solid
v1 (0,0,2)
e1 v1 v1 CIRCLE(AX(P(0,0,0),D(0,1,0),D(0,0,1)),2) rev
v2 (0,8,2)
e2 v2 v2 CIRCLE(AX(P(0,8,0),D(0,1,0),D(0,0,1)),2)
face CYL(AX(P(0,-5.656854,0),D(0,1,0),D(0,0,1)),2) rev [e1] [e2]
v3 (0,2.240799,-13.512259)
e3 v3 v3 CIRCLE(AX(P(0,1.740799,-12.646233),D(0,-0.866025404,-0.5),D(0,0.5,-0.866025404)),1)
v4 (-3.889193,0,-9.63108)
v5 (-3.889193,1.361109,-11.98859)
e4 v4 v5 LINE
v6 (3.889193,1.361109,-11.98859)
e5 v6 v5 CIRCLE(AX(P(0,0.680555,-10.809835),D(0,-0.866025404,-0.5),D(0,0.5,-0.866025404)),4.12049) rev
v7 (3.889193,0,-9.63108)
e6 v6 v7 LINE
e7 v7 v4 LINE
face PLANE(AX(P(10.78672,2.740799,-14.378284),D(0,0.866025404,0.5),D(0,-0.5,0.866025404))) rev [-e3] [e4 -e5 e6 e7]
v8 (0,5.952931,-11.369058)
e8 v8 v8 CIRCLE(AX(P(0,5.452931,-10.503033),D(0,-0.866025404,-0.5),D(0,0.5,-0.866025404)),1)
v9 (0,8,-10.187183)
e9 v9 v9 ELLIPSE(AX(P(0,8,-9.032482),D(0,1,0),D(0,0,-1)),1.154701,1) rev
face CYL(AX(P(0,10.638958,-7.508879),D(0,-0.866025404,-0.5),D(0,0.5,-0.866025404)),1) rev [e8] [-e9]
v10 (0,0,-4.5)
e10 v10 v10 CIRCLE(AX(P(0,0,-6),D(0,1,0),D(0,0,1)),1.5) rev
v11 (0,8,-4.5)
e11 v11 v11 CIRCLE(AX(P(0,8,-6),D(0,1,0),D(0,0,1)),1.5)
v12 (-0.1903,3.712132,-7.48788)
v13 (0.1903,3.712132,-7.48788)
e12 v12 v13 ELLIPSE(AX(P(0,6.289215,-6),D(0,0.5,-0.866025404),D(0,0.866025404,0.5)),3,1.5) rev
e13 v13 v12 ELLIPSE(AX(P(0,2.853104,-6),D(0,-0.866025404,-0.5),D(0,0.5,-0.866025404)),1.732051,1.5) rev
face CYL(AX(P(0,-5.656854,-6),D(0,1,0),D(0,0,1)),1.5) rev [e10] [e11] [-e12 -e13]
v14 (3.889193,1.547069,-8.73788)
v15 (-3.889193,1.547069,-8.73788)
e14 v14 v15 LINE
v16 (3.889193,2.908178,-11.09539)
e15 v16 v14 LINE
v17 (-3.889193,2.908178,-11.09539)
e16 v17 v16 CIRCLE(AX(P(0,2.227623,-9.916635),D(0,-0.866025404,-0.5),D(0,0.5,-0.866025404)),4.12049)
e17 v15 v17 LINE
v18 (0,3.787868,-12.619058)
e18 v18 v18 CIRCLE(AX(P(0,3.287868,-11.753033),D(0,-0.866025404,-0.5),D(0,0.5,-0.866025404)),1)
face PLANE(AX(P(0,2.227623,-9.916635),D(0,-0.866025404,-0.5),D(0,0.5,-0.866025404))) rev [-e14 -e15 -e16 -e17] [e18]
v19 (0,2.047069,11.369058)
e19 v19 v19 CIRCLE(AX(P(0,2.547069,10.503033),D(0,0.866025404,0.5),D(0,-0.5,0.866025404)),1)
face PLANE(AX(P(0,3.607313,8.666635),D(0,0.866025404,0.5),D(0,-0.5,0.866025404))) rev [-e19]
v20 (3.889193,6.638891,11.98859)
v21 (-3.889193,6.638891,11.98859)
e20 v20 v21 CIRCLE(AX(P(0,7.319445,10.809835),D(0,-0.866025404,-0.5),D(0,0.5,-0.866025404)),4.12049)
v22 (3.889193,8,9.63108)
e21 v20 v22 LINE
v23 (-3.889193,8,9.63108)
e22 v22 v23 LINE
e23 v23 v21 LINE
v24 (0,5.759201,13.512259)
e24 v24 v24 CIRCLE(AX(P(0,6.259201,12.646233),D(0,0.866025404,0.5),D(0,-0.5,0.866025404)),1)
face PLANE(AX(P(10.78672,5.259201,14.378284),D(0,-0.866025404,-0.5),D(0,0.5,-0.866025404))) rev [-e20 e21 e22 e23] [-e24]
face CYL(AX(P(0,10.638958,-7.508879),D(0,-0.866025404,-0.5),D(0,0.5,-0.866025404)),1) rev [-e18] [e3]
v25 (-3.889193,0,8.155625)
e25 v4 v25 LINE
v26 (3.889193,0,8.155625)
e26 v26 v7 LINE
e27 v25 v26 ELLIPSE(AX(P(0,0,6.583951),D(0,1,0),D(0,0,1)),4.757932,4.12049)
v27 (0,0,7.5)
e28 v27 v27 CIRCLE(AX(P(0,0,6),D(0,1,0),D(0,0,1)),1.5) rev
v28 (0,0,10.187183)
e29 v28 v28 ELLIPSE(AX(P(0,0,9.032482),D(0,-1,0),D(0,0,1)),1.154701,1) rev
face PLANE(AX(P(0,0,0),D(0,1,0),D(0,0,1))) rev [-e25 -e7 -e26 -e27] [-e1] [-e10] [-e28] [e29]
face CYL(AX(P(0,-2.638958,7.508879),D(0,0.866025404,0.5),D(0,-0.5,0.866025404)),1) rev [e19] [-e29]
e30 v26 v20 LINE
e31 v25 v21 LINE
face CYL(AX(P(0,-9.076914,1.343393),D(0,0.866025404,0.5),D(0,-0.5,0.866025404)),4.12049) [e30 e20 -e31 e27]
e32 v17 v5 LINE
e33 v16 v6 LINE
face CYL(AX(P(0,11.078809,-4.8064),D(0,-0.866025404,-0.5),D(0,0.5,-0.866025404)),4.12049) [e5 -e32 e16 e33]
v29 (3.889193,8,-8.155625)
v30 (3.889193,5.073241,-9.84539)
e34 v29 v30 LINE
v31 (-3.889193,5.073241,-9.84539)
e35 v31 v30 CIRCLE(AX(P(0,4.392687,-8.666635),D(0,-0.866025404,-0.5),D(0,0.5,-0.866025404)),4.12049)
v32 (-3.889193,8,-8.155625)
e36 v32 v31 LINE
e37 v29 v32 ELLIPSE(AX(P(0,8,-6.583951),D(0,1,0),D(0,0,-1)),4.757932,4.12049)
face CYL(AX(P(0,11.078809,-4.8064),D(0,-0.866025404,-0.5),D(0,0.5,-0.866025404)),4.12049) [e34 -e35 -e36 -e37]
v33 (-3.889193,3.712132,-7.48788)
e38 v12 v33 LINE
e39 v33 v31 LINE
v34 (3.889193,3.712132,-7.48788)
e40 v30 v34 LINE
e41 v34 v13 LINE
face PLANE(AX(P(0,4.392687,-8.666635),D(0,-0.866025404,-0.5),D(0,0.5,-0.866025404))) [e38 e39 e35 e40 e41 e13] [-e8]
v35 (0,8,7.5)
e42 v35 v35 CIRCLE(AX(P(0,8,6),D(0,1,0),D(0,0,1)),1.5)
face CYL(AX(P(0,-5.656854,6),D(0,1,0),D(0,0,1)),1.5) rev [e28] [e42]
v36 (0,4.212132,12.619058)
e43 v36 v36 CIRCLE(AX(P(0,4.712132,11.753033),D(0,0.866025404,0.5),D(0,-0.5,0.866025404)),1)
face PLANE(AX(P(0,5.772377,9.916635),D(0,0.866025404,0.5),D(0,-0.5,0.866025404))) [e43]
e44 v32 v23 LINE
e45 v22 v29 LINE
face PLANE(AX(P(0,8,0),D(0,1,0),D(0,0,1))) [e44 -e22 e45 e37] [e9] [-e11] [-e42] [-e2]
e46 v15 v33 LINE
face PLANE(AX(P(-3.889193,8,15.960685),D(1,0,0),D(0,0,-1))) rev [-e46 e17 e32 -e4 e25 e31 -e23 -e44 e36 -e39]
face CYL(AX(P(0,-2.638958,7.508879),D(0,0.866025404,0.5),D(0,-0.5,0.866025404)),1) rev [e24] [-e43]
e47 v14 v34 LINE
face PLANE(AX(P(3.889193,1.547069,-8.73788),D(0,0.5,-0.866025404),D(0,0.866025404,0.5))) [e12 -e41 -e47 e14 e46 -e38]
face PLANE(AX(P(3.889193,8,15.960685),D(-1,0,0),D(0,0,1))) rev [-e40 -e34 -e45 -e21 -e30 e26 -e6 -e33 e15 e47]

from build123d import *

# Parameters (mm, degrees)
SKETCH_1_W                      = 7.778385112
SKETCH_1_H                      = 31.92137072
EXTRUDE_1_DEPTH                 = 8
SKETCH_2_R                      = 1.5
SKETCH_2_R_2                    = 2
CUT_EXTRUDE_1_DEPTH             = 8
SKETCH_3_W                      = 7.778385112
SKETCH_3_H                      = 11.681320089
CUT_EXTRUDE_2_DEPTH             = 7
CUT_EXTRUDE_3_DEPTH             = 7.778385113
CUT_EXTRUDE_6_REACH             = 24.375
CUT_EXTRUDE_7_DEPTH             = 1.25
CUT_EXTRUDE_7_DEPTH_BACK        = 1.25
CUT_EXTRUDE_8_REACH             = 24.375
SKETCH_8_R                      = 1
PATTERN_CIRCULAR_5_COUNT        = 2
CUT_EXTRUDE_9_DEPTH             = 23.991982407
CUT_EXTRUDE_9_DEPTH_BACK        = 23.991982407
PATTERN_START                   = 3.938890695
PATTERN_CIRCULAR_14_OUTLINE_R   = 1
PATTERN_CIRCULAR_14_DEPTH       = 3.518451758
PATTERN_START_2                 = 9.957342453
PATTERN_CIRCULAR_14_2_OUTLINE_R = 1
PATTERN_CIRCULAR_14_2_DEPTH     = 1.78640085


# Read off the part's stored shape, not the designer's step: 阵列(圆周)14
with BuildPart() as part:
    # 草图1 → 凸台-拉伸1 (new body)
    with BuildSketch(Plane(origin=(0, 0, 0), x_dir=(1, 0, 0), z_dir=(0, 1, 0))):
        Rectangle(SKETCH_1_W, SKETCH_1_H)
    extrude(amount=EXTRUDE_1_DEPTH)

    # 草图2 → 切除-拉伸1 (cut)
    with BuildSketch(Plane(origin=(0, 8, 0), x_dir=(1, 0, 0), z_dir=(0, 1, 0))):
        with Locations(Location((0, 6, 0), (0, 0, 270))):
            Circle(SKETCH_2_R)
        with Locations(Location((0, -6, 0), (0, 0, 270))):
            Circle(SKETCH_2_R)
        with Locations(Location((0, 0, 0), (0, 0, 270))):
            Circle(SKETCH_2_R_2)
    extrude(amount=-CUT_EXTRUDE_1_DEPTH, mode=Mode.SUBTRACT)

    # 草图3 → 切除-拉伸2 (cut)
    with BuildSketch(Plane(origin=(0, 6.911179492, -11.97051402), x_dir=(-1, 0, 0), z_dir=(0, -0.499999999999998, 0.8660254037844398))):
        with Locations((0, 2.139682636)):
            Rectangle(SKETCH_3_W, SKETCH_3_H)
    cut_extrude_2 = extrude(amount=-CUT_EXTRUDE_2_DEPTH, mode=Mode.SUBTRACT)

    # 草图4 → 切除-拉伸3 (cut)
    with BuildSketch(Plane.ZY.offset(3.889192556)):
        Polygon((-14.378284056, 2.740799456), (-9.631080146, 0), (-15.96068536, 0), align=None)
    cut_extrude_3 = extrude(amount=-CUT_EXTRUDE_3_DEPTH, mode=Mode.SUBTRACT)

    # 切除-拉伸6: up to this plane
    cut_extrude_6_end = Plane(origin=(0, 8, 0), z_dir=(0, 1, 0))
    # 草图6 → 切除-拉伸6 (cut, up to the surface)
    with BuildSketch(Plane(origin=(0, -4.170380036, -2.407770036), x_dir=(1, 0, 0), z_dir=(0, -0.8660254037844396, -0.4999999999999982)), mode=Mode.PRIVATE) as cut_extrude_6_sk1:
        with BuildLine():
            Line((-3.889192556, -13.822358983), (5e-09, -13.822358983))
            ThreePointArc((5e-09, -13.822358983), (-2.384323859, -13.062439969), (-3.889192556, -11.062978192))
            Line((-3.889192556, -11.062978192), (-3.889192556, -13.822358983))
        make_face()
    cut_extrude_6_tool1 = split(extrude(cut_extrude_6_sk1.sketch, amount=-CUT_EXTRUDE_6_REACH, mode=Mode.PRIVATE), bisect_by=cut_extrude_6_end, keep=Keep.BOTH, mode=Mode.PRIVATE)
    add(cut_extrude_6_tool1.solids().sort_by_distance((-2.992661, 2.37004, -13.736111))[0], mode=Mode.SUBTRACT)
    # 草图6 → 切除-拉伸6 (cut, up to the surface)
    with BuildSketch(Plane(origin=(0, -4.170380036, -2.407770036), x_dir=(1, 0, 0), z_dir=(0, -0.8660254037844396, -0.4999999999999982)), mode=Mode.PRIVATE) as cut_extrude_6_sk2:
        with BuildLine():
            Line((3.889192556, -13.822358983), (3.889192556, -11.062978192))
            ThreePointArc((3.889192556, -11.062978192), (2.384323863, -13.062439966), (5e-09, -13.822358983))
            Line((5e-09, -13.822358983), (3.889192556, -13.822358983))
        make_face()
    cut_extrude_6_tool2 = split(extrude(cut_extrude_6_sk2.sketch, amount=-CUT_EXTRUDE_6_REACH, mode=Mode.PRIVATE), bisect_by=cut_extrude_6_end, keep=Keep.BOTH, mode=Mode.PRIVATE)
    add(cut_extrude_6_tool2.solids().sort_by_distance((2.992661, 2.37004, -13.736111))[0], mode=Mode.SUBTRACT)

    # 草图7 → 切除-拉伸7 (cut, two sides: drawn at the far end of the back side and taken through both)
    with BuildSketch(Plane(origin=(0, -1.540779764, -0.889569611), x_dir=(-1, 0, 0), z_dir=(0, -0.8660254037844396, -0.4999999999999983)).offset(-CUT_EXTRUDE_7_DEPTH_BACK)):
        with BuildLine():
            Line((-3.889192556, 11.062978192), (-3.889192556, 8.340760072))
            Line((-3.889192556, 8.340760072), (3.889192556, 8.340760072))
            Line((3.889192556, 8.340760072), (3.889192556, 11.062978192))
            ThreePointArc((3.889192556, 11.062978192), (0, 13.822358983), (-3.889192556, 11.062978192))
        make_face()
    extrude(amount=CUT_EXTRUDE_7_DEPTH + CUT_EXTRUDE_7_DEPTH_BACK, mode=Mode.SUBTRACT)

    # 切除-拉伸8: up to this plane
    cut_extrude_8_end = Plane(origin=(0, 8, 0), z_dir=(0, 1, 0))
    # 草图8 → 切除-拉伸8 (cut, up to the surface)
    with BuildSketch(Plane(origin=(0, -4.170380036, -2.407770036), x_dir=(1, 0, 0), z_dir=(0, -0.8660254037844396, -0.4999999999999982)), mode=Mode.PRIVATE) as cut_extrude_8_sk1:
        with Locations(Location((0, -11.822358983, 0), (0, 0, 270))):
            Circle(SKETCH_8_R)
    cut_extrude_8_tool1 = split(extrude(cut_extrude_8_sk1.sketch, amount=-CUT_EXTRUDE_8_REACH, mode=Mode.PRIVATE), bisect_by=cut_extrude_8_end, keep=Keep.BOTH, mode=Mode.PRIVATE)
    add(cut_extrude_8_tool1.solids().sort_by_distance((0, 1.740799, -12.646233))[0], mode=Mode.SUBTRACT)

    # 阵列(圆周)5: 切除-拉伸2, 切除-拉伸3 ×2 about axis
    pattern_circular_5_axis = Axis((-4.278111812, 4, 0), (1, 0, 0))
    add([cut_extrude_2.rotate(pattern_circular_5_axis, i * 360 / PATTERN_CIRCULAR_5_COUNT) for i in range(1, PATTERN_CIRCULAR_5_COUNT)], mode=Mode.SUBTRACT)
    add([cut_extrude_3.rotate(pattern_circular_5_axis, i * 360 / PATTERN_CIRCULAR_5_COUNT) for i in range(1, PATTERN_CIRCULAR_5_COUNT)], mode=Mode.SUBTRACT)

    # 草图10 → 切除-拉伸9 (cut, two sides: drawn at the far end of the back side and taken through both)
    with BuildSketch(Plane(origin=(0, 10.170380036, 5.871871652), x_dir=(1, 0, 0), z_dir=(0, 0.8660254037844388, 0.49999999999999994)).offset(-CUT_EXTRUDE_9_DEPTH_BACK)):
        with BuildLine():
            ThreePointArc((0, -9.822358983), (-2.384323861, -9.062439968), (-3.889192556, -7.062978192))
            Line((-3.889192556, -7.062978192), (-3.889192556, -9.822358983))
            Line((-3.889192556, -9.822358983), (0, -9.822358983))
        make_face()
        with BuildLine():
            ThreePointArc((3.889192556, -7.062978192), (2.384323861, -9.062439968), (0, -9.822358983))
            Line((0, -9.822358983), (3.889192556, -9.822358983))
            Line((3.889192556, -9.822358983), (3.889192556, -7.062978192))
        make_face()
    extrude(amount=CUT_EXTRUDE_9_DEPTH + CUT_EXTRUDE_9_DEPTH_BACK, mode=Mode.SUBTRACT)

    # 阵列(圆周)14 outline → 阵列(圆周)14 (cut)
    with BuildSketch(Plane(origin=(0, 0, 0), x_dir=(1, 0, 0), z_dir=(0, 0.8660254037844399, 0.49999999999999795)).offset(PATTERN_START)):
        with Locations((0, -7.822358983)):
            Circle(PATTERN_CIRCULAR_14_OUTLINE_R)
    extrude(amount=PATTERN_CIRCULAR_14_DEPTH, mode=Mode.SUBTRACT)

    # Pattern Circular 14 2 outline → Pattern Circular 14 2 (cut)
    with BuildSketch(Plane(origin=(0, 0, 0), x_dir=(1, 0, 0), z_dir=(0, 0.8660254037844399, 0.49999999999999795)).offset(PATTERN_START_2)):
        with Locations((0, -7.822358983)):
            Circle(PATTERN_CIRCULAR_14_2_OUTLINE_R)
    extrude(amount=PATTERN_CIRCULAR_14_2_DEPTH, mode=Mode.SUBTRACT)


solid = part.part
